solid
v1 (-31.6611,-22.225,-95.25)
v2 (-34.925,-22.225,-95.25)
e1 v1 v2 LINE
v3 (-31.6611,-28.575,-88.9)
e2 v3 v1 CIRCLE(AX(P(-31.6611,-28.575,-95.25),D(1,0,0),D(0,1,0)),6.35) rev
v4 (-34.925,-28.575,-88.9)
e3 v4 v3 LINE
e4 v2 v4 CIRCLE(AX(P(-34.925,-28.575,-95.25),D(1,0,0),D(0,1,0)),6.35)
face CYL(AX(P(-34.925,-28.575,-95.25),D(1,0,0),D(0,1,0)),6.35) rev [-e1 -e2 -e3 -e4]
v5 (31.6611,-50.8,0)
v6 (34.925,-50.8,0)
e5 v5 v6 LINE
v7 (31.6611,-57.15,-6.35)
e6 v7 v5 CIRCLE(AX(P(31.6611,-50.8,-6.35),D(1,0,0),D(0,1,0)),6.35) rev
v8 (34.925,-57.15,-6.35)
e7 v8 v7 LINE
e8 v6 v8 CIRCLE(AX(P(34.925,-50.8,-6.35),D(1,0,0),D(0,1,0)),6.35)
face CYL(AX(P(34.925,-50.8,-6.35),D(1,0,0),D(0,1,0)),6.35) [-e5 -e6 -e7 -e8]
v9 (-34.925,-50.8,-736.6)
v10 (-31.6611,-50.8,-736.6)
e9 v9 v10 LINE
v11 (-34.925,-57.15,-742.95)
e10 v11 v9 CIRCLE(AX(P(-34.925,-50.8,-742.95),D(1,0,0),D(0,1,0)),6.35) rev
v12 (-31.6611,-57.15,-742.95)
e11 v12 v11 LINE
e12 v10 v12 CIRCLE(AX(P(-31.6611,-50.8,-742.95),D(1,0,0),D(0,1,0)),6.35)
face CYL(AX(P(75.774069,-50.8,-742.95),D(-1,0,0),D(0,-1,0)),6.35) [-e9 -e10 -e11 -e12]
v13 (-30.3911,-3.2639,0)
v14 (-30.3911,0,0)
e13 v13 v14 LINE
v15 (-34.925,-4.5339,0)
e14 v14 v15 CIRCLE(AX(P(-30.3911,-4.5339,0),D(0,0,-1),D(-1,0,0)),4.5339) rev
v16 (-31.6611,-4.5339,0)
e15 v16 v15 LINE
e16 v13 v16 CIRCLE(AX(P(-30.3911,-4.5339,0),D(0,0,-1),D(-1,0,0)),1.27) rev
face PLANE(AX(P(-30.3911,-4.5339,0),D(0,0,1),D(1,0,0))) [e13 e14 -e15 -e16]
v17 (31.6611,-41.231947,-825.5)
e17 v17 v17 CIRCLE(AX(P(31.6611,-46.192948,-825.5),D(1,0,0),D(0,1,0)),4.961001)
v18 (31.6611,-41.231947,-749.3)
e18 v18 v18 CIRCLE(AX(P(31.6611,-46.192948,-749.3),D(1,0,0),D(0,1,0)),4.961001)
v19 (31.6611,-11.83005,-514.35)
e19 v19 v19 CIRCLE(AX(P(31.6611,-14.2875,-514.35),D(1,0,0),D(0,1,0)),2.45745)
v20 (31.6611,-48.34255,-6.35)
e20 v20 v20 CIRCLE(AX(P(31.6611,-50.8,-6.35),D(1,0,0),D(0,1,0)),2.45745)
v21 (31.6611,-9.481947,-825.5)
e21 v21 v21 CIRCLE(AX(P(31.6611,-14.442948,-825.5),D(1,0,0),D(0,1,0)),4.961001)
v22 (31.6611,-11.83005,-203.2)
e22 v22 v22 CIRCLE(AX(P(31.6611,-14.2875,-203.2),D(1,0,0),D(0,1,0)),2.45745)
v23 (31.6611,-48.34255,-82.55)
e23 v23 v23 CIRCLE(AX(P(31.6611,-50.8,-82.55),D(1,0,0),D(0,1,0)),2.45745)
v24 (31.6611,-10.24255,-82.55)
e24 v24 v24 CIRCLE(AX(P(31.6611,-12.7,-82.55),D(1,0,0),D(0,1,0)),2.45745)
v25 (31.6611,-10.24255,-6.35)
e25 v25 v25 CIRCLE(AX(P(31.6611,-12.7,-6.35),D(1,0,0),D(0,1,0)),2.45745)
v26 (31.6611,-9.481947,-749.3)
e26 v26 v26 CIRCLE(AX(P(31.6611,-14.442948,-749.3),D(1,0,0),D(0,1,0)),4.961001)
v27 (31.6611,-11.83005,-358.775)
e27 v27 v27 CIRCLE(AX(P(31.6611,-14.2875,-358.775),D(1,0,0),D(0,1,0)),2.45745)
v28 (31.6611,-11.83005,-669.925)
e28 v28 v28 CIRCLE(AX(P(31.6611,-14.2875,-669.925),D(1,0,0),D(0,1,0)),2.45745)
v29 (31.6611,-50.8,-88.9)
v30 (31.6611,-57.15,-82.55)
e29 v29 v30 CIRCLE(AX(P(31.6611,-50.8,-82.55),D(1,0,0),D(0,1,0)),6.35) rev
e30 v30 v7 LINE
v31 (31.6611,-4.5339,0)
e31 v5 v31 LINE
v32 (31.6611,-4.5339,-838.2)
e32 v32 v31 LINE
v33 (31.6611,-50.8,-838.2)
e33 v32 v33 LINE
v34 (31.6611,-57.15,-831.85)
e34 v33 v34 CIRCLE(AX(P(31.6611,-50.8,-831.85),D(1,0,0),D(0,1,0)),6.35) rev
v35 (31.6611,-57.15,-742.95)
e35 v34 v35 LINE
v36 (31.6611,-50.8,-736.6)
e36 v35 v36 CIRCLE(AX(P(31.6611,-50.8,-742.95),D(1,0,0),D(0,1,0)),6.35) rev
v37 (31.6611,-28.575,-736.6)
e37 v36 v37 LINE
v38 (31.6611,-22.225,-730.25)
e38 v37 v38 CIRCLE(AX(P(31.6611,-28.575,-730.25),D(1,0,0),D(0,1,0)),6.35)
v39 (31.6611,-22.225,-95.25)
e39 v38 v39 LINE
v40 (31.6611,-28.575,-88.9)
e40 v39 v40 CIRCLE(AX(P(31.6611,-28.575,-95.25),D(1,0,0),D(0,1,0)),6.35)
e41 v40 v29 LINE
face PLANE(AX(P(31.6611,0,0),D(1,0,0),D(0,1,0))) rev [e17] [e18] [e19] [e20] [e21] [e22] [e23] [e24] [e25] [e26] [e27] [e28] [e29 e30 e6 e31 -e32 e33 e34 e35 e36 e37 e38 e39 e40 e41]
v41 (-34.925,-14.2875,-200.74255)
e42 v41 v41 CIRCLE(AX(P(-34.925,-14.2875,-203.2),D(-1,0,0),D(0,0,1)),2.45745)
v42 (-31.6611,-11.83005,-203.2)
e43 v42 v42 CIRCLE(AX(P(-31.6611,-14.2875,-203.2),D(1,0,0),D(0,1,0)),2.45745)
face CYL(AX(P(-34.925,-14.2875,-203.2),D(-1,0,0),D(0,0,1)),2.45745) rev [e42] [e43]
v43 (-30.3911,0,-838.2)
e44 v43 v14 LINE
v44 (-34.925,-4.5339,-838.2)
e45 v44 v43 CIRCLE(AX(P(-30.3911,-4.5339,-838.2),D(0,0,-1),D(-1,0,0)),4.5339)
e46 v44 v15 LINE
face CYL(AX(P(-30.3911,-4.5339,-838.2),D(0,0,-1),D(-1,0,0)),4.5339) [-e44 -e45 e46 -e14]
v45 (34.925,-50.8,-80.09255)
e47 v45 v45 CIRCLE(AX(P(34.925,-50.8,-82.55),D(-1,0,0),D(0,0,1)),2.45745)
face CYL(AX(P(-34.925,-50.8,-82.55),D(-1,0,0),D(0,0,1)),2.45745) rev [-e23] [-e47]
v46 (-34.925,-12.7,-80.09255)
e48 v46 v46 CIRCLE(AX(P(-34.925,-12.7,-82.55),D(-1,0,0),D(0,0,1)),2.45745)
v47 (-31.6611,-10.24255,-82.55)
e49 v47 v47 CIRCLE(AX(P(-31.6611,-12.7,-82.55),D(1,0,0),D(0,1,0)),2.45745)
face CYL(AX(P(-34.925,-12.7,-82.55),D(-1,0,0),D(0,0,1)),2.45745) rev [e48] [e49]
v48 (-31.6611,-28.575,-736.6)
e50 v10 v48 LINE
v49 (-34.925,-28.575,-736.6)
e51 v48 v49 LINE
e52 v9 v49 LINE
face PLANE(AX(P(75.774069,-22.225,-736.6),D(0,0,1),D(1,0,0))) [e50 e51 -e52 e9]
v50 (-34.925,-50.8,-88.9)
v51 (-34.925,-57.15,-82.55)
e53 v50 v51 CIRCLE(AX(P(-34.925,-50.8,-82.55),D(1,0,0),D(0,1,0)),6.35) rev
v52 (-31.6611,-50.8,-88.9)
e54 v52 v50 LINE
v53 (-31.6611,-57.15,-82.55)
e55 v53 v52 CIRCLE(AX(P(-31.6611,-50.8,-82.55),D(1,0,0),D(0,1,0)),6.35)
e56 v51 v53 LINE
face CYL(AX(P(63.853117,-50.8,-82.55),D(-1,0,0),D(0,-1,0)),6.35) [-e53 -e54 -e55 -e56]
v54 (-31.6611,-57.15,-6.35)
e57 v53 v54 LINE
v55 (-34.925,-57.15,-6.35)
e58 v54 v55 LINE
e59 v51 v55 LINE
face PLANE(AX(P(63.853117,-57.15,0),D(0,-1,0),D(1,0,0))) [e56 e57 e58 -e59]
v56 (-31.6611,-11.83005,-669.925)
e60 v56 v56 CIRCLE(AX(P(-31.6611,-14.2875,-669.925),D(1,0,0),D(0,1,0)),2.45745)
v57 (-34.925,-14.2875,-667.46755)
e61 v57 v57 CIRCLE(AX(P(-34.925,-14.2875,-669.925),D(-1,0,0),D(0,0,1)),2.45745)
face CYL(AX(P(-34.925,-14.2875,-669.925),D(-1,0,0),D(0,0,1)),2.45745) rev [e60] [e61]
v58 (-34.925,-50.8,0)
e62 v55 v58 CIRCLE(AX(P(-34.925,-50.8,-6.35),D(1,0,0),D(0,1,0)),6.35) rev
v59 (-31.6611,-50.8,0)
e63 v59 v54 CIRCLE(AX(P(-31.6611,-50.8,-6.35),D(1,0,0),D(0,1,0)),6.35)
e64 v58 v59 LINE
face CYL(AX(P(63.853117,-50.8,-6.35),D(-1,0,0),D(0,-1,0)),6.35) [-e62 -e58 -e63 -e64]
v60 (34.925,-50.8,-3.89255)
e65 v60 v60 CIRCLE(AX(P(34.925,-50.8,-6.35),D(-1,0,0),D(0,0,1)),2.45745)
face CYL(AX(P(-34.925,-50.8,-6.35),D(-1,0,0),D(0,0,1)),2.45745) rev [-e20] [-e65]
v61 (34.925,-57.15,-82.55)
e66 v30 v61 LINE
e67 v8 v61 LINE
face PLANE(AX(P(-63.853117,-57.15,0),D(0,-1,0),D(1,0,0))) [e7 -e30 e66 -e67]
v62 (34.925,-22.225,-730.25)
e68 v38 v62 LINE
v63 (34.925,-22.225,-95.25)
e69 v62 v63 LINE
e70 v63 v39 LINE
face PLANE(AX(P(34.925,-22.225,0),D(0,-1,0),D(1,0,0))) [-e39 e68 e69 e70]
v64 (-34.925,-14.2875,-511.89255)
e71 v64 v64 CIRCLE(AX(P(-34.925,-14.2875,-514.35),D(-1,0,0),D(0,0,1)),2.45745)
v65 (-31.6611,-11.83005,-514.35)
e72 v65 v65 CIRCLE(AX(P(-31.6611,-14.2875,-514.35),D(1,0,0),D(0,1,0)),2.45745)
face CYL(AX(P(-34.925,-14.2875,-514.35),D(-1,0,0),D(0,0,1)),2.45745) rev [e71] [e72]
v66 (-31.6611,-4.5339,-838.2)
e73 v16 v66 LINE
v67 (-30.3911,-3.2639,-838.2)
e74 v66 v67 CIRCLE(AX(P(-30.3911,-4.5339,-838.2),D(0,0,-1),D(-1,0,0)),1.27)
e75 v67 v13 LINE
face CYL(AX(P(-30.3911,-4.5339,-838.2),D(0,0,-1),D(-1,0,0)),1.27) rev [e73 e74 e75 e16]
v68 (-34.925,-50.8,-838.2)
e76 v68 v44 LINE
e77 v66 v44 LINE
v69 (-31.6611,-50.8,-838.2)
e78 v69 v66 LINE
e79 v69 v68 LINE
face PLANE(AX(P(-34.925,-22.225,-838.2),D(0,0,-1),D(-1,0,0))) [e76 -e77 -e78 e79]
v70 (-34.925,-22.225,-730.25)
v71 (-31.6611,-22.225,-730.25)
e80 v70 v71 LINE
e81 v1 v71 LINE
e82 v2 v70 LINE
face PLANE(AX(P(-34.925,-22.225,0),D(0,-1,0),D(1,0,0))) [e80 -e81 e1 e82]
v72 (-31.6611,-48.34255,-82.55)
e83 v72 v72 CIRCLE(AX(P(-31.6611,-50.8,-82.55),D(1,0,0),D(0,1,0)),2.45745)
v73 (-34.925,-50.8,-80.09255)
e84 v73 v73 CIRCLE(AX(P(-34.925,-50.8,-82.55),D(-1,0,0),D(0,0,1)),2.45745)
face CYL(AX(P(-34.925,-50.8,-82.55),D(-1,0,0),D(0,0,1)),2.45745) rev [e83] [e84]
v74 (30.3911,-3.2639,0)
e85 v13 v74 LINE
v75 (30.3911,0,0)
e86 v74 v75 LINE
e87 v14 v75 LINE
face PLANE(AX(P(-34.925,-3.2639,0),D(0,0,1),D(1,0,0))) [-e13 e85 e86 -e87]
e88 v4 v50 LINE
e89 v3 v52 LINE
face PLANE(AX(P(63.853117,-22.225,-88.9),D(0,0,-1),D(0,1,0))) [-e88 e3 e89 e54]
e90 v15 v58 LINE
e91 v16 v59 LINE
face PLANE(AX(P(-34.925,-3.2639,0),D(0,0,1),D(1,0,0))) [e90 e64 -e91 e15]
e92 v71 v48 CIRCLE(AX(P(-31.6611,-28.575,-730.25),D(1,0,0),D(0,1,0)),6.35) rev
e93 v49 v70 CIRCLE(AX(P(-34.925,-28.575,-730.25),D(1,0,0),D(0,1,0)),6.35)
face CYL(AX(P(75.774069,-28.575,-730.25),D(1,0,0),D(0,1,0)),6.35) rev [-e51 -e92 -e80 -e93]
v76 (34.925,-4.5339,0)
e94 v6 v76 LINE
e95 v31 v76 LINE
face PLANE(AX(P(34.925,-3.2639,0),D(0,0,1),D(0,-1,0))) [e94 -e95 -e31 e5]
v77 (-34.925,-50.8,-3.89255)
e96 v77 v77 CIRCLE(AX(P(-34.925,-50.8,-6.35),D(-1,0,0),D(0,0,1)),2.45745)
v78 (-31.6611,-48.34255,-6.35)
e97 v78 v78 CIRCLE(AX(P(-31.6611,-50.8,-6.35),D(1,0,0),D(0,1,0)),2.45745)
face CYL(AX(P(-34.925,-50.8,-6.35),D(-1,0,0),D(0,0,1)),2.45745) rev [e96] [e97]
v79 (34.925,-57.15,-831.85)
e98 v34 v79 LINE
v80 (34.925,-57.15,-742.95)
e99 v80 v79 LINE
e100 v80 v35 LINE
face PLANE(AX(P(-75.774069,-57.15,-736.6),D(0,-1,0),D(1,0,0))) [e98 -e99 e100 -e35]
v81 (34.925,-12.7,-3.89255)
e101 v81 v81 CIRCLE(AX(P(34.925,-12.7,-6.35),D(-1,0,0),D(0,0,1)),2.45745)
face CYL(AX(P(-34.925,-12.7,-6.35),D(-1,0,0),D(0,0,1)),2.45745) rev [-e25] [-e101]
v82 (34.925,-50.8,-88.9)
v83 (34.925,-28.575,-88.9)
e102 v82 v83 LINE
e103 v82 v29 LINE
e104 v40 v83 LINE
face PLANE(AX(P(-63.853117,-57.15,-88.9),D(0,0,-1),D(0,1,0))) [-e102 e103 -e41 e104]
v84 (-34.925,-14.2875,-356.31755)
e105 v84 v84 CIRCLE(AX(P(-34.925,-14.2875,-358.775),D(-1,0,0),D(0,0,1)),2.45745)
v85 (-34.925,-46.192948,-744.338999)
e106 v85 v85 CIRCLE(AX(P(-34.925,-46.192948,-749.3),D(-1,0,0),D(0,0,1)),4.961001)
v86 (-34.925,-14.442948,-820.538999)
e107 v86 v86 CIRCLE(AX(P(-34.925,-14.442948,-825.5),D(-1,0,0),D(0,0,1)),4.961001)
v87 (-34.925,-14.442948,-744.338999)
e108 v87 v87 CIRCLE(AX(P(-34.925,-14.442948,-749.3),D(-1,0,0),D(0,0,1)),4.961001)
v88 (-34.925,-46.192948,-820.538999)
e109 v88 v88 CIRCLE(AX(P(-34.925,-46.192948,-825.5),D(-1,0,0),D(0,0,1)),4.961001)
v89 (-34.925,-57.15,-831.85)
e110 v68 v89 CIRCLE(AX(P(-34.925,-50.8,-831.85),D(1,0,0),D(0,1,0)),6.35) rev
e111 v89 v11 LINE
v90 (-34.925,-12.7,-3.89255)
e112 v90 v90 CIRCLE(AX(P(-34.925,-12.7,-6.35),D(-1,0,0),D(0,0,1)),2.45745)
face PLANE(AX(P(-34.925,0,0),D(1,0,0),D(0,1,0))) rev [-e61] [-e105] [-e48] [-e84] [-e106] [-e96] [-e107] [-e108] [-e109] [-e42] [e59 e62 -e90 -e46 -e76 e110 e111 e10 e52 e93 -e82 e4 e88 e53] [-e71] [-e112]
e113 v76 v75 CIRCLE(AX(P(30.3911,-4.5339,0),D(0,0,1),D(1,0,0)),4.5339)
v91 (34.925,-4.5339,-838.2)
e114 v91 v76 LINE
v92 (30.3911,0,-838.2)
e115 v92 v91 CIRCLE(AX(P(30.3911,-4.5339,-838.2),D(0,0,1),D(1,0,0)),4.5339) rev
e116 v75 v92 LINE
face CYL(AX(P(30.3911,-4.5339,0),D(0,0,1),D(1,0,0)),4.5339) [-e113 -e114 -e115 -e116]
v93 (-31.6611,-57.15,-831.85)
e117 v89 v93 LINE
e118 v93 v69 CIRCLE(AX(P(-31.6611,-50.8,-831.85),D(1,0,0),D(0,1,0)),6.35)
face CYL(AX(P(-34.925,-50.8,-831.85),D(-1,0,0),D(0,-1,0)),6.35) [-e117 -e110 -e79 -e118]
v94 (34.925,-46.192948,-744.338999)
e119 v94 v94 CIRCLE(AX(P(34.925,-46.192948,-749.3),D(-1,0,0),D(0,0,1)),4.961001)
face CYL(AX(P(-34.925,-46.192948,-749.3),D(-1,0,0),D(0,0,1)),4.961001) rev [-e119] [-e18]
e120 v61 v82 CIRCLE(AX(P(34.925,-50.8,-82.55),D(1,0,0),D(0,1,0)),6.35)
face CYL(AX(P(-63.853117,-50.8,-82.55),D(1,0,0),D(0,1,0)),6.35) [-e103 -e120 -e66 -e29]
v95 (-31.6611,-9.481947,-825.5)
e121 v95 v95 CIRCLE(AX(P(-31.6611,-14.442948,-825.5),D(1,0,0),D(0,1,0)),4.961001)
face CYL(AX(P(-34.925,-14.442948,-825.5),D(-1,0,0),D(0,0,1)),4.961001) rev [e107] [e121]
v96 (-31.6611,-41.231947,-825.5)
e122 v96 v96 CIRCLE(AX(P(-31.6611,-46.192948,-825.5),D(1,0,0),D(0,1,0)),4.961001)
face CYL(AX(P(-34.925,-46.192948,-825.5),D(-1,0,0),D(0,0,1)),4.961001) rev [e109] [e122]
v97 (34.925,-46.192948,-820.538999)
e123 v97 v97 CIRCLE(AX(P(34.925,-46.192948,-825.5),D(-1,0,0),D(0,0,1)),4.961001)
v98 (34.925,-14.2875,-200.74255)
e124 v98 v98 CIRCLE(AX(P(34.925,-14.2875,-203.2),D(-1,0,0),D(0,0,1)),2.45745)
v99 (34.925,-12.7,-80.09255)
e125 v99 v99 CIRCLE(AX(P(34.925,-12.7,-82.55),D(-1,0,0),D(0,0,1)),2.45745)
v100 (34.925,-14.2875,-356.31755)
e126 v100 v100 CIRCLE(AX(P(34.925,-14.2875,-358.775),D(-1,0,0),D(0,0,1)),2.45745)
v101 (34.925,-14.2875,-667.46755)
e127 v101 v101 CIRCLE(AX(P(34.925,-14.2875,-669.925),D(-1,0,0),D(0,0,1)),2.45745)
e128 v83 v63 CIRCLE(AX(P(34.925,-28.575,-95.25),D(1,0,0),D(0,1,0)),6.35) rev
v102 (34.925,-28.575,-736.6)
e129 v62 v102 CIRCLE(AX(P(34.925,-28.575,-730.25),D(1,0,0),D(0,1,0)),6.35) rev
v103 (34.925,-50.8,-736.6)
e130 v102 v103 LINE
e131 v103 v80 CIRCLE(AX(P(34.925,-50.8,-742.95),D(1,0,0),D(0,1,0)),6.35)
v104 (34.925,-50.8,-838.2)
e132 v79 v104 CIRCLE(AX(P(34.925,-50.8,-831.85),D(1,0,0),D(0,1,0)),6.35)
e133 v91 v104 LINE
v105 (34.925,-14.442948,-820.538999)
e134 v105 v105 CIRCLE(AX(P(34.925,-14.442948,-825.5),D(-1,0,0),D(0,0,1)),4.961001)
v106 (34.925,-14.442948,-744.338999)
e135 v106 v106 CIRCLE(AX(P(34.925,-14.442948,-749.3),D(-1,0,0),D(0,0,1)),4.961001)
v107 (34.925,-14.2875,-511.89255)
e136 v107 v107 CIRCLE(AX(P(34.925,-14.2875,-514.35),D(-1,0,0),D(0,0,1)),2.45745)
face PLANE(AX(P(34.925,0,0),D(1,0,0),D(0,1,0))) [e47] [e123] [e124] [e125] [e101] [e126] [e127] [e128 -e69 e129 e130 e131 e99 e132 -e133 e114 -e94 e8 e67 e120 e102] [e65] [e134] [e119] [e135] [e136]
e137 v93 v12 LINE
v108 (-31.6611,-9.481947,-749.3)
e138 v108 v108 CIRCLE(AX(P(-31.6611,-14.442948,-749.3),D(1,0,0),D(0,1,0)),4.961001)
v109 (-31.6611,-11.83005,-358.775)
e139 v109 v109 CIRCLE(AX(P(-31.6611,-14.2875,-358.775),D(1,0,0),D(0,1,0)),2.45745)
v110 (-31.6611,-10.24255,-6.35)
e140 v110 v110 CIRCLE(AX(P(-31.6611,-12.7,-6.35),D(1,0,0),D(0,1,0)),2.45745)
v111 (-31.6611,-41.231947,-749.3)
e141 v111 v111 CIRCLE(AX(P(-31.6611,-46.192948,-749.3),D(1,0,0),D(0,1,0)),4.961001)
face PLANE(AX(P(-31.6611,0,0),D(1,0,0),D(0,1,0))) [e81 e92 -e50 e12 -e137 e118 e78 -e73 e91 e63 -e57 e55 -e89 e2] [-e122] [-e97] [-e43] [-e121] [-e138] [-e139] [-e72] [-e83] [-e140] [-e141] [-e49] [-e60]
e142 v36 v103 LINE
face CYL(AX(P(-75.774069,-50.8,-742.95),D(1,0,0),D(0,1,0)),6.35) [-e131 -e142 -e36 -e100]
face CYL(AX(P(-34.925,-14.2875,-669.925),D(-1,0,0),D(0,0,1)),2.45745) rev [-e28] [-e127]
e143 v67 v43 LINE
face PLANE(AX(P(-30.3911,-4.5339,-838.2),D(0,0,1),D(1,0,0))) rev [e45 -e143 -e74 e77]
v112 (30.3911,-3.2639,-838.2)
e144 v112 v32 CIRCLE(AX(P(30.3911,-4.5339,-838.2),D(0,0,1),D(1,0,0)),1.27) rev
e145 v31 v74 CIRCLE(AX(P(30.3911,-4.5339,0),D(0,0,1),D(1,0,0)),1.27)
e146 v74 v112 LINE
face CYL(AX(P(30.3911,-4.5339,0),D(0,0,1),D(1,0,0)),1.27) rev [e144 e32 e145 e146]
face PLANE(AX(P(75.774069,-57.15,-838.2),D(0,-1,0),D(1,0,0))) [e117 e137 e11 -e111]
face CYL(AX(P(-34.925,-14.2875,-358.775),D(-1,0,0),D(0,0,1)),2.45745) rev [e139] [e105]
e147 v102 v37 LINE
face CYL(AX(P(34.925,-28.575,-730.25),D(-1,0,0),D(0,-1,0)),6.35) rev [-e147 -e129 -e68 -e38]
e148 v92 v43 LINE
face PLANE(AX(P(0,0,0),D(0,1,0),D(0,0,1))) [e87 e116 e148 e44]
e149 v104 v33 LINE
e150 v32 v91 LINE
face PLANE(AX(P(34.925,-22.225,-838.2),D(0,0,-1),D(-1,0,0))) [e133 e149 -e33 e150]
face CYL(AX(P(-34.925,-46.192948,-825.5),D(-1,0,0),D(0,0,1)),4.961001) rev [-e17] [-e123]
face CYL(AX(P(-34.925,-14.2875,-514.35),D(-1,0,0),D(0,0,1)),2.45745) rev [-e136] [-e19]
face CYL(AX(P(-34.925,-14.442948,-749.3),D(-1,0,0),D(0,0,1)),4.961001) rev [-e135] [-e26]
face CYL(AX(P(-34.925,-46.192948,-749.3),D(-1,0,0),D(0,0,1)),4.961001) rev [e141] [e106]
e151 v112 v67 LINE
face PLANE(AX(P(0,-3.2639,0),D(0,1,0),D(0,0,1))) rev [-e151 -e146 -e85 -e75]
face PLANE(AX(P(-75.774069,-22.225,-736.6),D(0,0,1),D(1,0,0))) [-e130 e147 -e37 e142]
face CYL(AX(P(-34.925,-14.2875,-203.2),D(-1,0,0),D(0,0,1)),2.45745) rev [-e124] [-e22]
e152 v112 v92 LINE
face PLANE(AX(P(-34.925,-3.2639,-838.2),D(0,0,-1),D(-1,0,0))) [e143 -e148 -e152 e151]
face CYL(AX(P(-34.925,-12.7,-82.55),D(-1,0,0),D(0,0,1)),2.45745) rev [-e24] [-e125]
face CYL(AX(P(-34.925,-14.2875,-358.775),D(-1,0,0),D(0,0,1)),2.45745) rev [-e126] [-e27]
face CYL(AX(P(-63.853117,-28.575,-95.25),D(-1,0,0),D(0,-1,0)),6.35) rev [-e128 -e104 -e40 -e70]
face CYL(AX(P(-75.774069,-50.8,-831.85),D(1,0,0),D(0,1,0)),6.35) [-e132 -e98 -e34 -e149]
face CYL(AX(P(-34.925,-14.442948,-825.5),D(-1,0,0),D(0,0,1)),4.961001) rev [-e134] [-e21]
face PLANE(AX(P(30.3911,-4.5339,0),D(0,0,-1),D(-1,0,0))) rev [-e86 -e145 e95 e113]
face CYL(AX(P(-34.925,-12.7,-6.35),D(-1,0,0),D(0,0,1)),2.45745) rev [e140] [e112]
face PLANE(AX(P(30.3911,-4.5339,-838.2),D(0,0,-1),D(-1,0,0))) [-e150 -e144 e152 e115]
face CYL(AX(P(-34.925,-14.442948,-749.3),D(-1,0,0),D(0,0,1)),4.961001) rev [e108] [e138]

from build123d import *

# Parameters (mm, degrees)
SKETCH1_W                        = 69.85
SKETCH1_H                        = 838.2
BASE_FLANGE1_DEPTH               = 3.2639
EDGE_FLANGE2_STRIP_W             = 15.5956
EDGE_FLANGE2_STRIP_H             = 3.2639
EDGE_FLANGE2_STRIP_CUT_DEPTH     = 838.2
EDGE_FLANGE2_STRIP_2_W           = 15.5956
EDGE_FLANGE2_STRIP_2_H           = 3.2639
EDGE_FLANGE2_STRIP_CUT_2_DEPTH   = 838.2
EDGE_FLANGE2_DEPTH               = 838.2
EDGE_FLANGE2_BEND_DEPTH          = 838.2
SKETCH23_W                       = 101.6
SKETCH23_H                       = 34.925
BOSS_EXTRUDE1_DEPTH              = 3.2639
SKETCH24_W                       = 101.6
SKETCH24_H                       = 34.925
BOSS_EXTRUDE2_DEPTH              = 3.2639
SKETCH32_W                       = 88.9
SKETCH32_H                       = 34.925
BOSS_EXTRUDE3_DEPTH              = 3.2639
BOSS_EXTRUDE4_START              = -3.2639
SKETCH33_W                       = 88.9
SKETCH33_H                       = 34.925
BOSS_EXTRUDE4_DEPTH              = 3.2639
F_10_0_1935_DIAMETER_HOLE2_D     = 4.9149
LPATTERN2_COUNT                  = 4
LPATTERN2_PITCH                  = 155.575
F_25_64_0_39063_DIAMETER_HOLE1_D = 9.922002
F_10_0_1935_DIAMETER_HOLE3_D     = 4.9149
FILLET2_R                        = 6.35


# Sheet-metal steps are written as plain solids
with BuildPart() as part:
    # Sketch1 → Base-Flange1 (new body)
    with BuildSketch(Plane(origin=(0, 0, 0), x_dir=(1, 0, 0), z_dir=(0, 1, 0))):
        with Locations((0, 419.1)):
            Rectangle(SKETCH1_W, SKETCH1_H)
    extrude(amount=-BASE_FLANGE1_DEPTH)

    # Edge-Flange2 strip (across the edge) → Edge-Flange2 strip cut (cut)
    with BuildSketch(Plane(origin=(34.925, -3.2639, -838.2), x_dir=(-1, 0, 0), z_dir=(0, 0, 1))):
        with Locations((-3.2639, -1.63195)):
            Rectangle(EDGE_FLANGE2_STRIP_W, EDGE_FLANGE2_STRIP_H)
    extrude(amount=EDGE_FLANGE2_STRIP_CUT_DEPTH, mode=Mode.SUBTRACT)

    # Edge-Flange2 strip 2 (across the edge) → Edge-Flange2 strip cut 2 (cut)
    with BuildSketch(Plane(origin=(-34.925, -3.2639, 0), x_dir=(1, 0, 0), z_dir=(0, 0, -1))):
        with Locations((-3.2639, -1.63195)):
            Rectangle(EDGE_FLANGE2_STRIP_2_W, EDGE_FLANGE2_STRIP_2_H)
    extrude(amount=EDGE_FLANGE2_STRIP_CUT_2_DEPTH, mode=Mode.SUBTRACT)

    # Edge-Flange2 section (across the edge) → Edge-Flange2 (add)
    with BuildSketch(Plane(origin=(34.925, -3.2639, -838.2), x_dir=(-1, 0, 0), z_dir=(0, 0, 1))):
        with BuildLine():
            Line((0, 1.27), (0, 18.9611))
            Line((0, 18.9611), (3.2639, 18.9611))
            Line((3.2639, 18.9611), (3.2639, 1.27))
            ThreePointArc((3.2639, 1.27), (3.635874388, 0.371974388), (4.5339, 0))
            Line((4.5339, 0), (4.5339, -3.2639))
            ThreePointArc((4.5339, -3.2639), (1.327948565, -1.935951435), (0, 1.27))
        make_face()
    extrude(amount=EDGE_FLANGE2_DEPTH)

    # Edge-Flange2 section 2 (across the edge) → Edge-Flange2 bend (add)
    with BuildSketch(Plane(origin=(-34.925, -3.2639, 0), x_dir=(1, 0, 0), z_dir=(0, 0, -1))):
        with BuildLine():
            Line((0, 1.27), (0, 18.9611))
            Line((0, 18.9611), (3.2639, 18.9611))
            Line((3.2639, 18.9611), (3.2639, 1.27))
            ThreePointArc((3.2639, 1.27), (3.635874388, 0.371974388), (4.5339, 0))
            Line((4.5339, 0), (4.5339, -3.2639))
            ThreePointArc((4.5339, -3.2639), (1.327948565, -1.935951435), (0, 1.27))
        make_face()
    extrude(amount=EDGE_FLANGE2_BEND_DEPTH)

    # Sketch23 → Boss-Extrude1 (add)
    with BuildSketch(Plane.ZY.offset(34.925)):
        with Locations((-787.4, -39.6875)):
            Rectangle(SKETCH23_W, SKETCH23_H)
    extrude(amount=-BOSS_EXTRUDE1_DEPTH)

    # Sketch24 → Boss-Extrude2 (add)
    with BuildSketch(Plane(origin=(34.925, 0, 0), x_dir=(0, 0, -1), z_dir=(1, 0, 0))):
        with Locations((787.4, -39.6875)):
            Rectangle(SKETCH24_W, SKETCH24_H)
    extrude(amount=-BOSS_EXTRUDE2_DEPTH)

    # Sketch32 → Boss-Extrude3 (add)
    with BuildSketch(Plane.ZY.offset(34.925)):
        with Locations((-44.45, -39.6875)):
            Rectangle(SKETCH32_W, SKETCH32_H)
    extrude(amount=-BOSS_EXTRUDE3_DEPTH)

    # Sketch33 → Boss-Extrude4 (add)
    with BuildSketch(Plane(origin=(34.925, 0, 0), x_dir=(0, 0, -1), z_dir=(1, 0, 0)).offset(BOSS_EXTRUDE4_START)):
        with Locations((44.45, -39.6875)):
            Rectangle(SKETCH33_W, SKETCH33_H)
    extrude(amount=BOSS_EXTRUDE4_DEPTH)

    # #10 (0.1935) Diameter Hole2 (through all)
    with Locations(Plane.ZY.offset(34.925)):
        with Locations((-203.2, -14.2875)):
            f_10_0_1935_diameter_hole2 = Hole(F_10_0_1935_DIAMETER_HOLE2_D / 2)

    # LPattern2: #10 (0.1935) Diameter Hole2 ×4
    with Locations(*[(0, 0, -i * LPATTERN2_PITCH) for i in range(1, LPATTERN2_COUNT)]):
        add(f_10_0_1935_diameter_hole2, mode=Mode.SUBTRACT)

    # 25/64 (0.39063) Diameter Hole1 (through all)
    with Locations(Plane.ZY.offset(34.925)):
        with Locations((-825.5, -14.442948), (-825.5, -46.192948), (-749.3, -14.442948), (-749.3, -46.192948)):
            Hole(F_25_64_0_39063_DIAMETER_HOLE1_D / 2)

    # #10 (0.1935) Diameter Hole3 (through all)
    with Locations(Plane.ZY.offset(34.925)):
        with Locations((-82.55, -12.7), (-82.55, -50.8), (-6.35, -12.7), (-6.35, -50.8)):
            Hole(F_10_0_1935_DIAMETER_HOLE3_D / 2)

    # Fillet2
    fillet2_edges = [part.edges().sort_by_distance(p)[0] for p in [
        (-33.29305, -22.225, -88.9),
        (-33.29305, -57.15, -88.9),
        (-33.29305, -57.15, 0),
        (33.29305, -57.15, 0),
        (33.29305, -22.225, -88.9),
        (33.29305, -57.15, -88.9),
        (-33.29305, -57.15, -736.6),
        (-33.29305, -22.225, -736.6),
        (-33.29305, -57.15, -838.2),
        (33.29305, -57.15, -838.2),
        (33.29305, -57.15, -736.6),
        (33.29305, -22.225, -736.6),
    ]]
    fillet(fillet2_edges, radius=FILLET2_R)


solid = part.part
